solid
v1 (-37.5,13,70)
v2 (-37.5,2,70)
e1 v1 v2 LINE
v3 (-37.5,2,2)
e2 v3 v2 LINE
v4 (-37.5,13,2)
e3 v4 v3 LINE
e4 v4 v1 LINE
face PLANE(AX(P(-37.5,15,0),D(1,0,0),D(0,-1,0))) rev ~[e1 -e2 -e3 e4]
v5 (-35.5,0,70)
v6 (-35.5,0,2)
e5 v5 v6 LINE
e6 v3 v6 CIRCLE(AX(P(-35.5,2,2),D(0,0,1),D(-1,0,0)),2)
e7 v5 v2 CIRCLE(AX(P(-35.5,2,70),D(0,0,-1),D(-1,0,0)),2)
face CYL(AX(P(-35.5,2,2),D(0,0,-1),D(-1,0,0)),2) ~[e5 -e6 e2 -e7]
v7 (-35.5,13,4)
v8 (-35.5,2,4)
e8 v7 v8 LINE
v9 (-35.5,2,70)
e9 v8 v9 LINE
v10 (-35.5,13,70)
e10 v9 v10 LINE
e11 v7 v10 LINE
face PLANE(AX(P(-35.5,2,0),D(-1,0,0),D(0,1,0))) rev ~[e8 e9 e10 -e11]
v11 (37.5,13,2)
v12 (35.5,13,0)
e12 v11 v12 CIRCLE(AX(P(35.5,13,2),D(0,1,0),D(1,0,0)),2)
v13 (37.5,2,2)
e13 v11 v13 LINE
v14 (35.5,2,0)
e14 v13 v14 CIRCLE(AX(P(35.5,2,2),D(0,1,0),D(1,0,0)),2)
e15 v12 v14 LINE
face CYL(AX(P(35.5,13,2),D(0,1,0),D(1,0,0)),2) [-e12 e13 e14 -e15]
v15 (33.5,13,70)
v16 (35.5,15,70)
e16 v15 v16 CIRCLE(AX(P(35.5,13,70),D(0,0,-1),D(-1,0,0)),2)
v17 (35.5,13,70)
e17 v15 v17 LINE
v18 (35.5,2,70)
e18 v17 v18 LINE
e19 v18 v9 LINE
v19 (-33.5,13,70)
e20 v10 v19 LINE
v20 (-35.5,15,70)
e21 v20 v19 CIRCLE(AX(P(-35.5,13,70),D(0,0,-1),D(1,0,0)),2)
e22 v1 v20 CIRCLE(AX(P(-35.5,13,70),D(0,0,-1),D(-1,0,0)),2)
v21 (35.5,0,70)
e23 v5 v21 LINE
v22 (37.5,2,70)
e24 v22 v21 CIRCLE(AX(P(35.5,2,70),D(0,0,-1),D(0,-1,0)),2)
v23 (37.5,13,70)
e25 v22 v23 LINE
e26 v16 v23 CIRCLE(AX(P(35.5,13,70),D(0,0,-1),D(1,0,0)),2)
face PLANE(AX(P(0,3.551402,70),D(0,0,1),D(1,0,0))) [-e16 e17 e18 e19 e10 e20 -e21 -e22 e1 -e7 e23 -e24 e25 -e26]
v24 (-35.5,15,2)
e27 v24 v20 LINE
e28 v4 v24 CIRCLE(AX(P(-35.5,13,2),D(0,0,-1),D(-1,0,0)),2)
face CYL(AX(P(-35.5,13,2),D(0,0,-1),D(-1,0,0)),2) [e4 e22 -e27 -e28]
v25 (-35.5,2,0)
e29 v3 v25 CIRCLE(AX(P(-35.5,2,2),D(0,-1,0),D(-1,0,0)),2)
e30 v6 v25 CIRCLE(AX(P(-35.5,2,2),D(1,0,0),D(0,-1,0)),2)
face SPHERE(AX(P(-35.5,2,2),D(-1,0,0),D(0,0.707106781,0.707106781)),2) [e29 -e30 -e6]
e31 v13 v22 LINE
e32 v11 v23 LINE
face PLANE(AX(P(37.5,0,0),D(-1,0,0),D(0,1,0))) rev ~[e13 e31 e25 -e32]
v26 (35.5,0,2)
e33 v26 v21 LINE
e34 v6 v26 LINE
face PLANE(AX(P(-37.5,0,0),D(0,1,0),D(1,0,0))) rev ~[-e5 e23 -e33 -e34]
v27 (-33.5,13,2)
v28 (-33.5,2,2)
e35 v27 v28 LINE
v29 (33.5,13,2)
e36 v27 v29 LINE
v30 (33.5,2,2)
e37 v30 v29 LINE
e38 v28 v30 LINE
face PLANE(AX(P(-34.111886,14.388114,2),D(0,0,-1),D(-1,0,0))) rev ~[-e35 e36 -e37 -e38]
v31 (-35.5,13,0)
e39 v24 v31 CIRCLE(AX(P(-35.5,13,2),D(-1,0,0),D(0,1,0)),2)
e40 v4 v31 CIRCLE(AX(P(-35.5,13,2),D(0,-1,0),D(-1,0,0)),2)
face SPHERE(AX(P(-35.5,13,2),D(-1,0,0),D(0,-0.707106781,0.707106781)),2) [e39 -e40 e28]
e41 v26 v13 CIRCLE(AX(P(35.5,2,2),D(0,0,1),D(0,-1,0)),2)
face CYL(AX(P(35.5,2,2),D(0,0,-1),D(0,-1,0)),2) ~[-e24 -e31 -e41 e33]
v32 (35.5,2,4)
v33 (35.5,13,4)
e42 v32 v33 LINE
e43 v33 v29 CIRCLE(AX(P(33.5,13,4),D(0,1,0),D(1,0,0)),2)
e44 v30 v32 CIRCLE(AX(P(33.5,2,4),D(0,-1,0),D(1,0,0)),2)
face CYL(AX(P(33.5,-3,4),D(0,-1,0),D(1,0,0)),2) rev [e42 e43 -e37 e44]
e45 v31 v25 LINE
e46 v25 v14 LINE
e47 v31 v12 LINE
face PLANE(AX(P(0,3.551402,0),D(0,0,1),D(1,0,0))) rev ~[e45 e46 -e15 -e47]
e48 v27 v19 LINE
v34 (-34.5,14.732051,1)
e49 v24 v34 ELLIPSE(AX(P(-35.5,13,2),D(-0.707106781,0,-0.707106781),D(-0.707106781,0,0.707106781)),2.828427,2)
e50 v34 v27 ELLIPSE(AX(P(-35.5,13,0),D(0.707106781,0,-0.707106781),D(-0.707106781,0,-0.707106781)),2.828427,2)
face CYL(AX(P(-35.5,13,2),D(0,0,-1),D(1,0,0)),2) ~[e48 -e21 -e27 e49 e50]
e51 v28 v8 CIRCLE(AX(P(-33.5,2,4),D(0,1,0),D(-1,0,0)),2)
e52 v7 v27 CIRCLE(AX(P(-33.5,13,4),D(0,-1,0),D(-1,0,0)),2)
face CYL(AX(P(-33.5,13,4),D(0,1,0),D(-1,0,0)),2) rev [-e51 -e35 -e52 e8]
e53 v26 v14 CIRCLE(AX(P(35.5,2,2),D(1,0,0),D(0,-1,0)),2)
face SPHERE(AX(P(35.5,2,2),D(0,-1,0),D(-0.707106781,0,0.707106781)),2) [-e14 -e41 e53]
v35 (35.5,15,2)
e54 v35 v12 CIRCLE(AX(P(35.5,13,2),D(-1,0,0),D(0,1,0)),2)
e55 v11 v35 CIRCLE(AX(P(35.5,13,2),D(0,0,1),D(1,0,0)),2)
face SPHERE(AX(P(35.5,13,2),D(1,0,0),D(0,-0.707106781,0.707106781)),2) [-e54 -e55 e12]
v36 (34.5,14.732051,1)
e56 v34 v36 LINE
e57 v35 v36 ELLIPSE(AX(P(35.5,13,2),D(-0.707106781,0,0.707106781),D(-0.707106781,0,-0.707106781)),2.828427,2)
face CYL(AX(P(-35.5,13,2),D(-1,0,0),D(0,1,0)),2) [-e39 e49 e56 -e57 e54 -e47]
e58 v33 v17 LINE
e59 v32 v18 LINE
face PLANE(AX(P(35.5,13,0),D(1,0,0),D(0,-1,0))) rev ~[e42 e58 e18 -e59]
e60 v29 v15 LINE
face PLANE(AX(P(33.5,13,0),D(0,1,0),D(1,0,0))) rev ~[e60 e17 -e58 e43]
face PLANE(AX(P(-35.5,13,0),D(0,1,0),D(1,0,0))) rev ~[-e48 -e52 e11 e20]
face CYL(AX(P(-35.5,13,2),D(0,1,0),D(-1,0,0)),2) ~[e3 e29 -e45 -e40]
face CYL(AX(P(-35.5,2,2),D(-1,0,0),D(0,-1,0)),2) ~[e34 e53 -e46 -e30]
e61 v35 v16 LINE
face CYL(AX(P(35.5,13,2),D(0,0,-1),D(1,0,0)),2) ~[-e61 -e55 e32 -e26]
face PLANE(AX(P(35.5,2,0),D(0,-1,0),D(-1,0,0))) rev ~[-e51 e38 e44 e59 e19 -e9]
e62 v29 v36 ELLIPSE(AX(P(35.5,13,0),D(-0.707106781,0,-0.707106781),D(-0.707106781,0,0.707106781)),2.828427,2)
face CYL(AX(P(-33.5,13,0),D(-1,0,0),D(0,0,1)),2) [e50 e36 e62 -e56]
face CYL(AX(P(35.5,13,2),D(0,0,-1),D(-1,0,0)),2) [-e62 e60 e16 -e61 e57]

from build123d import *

# Parameters (mm, degrees)
F0_DEPTH     = 70
F1_W         = 75
F1_H         = 15
F4_DEPTH     = 2
F2_T1_DEPTH  = 11
F2_T3_DEPTH  = 73
F2_T5_DEPTH  = 67
F2_T7_DEPTH  = 71
F2_S11_W     = 2.04
F2_S11_H     = 2.04
F2_T12_DEPTH = 2.04
F2_S17_W     = 2.04
F2_S17_H     = 2.04
F2_T18_DEPTH = 2.04
F2_S23_W     = 2.04
F2_S23_H     = 2.04
F2_T24_DEPTH = 2.04
F2_S29_W     = 2.04
F2_S29_H     = 2.04
F2_T30_DEPTH = 2.04
F2_T37_DEPTH = 73
F2_T42_DEPTH = 72
F2_T50_DEPTH = 72
F2_T55_DEPTH = 73
F2_T62_DEPTH = 16
F2_T67_DEPTH = 16


# Not quite as in the source:
# - a fillet or chamfer that OpenCascade refuses, or shapes differently, is made with other operations: its cross-section is extruded or revolved along the edge and cut away or added
# - a feature names something its author has since deleted; it is built from what else it names


with BuildPart() as f0:
    # F3 (on Top) → F0 (new body)
    with BuildSketch(Plane.XY):
        Polygon((-37.5, 15), (-37.5, 0), (37.5, 0), (37.5, 15), (33.5, 15), (33.5, 13), (35.5, 13), (35.5, 2), (-35.5, 2), (-35.5, 13), (-33.5, 13), (-33.5, 15), align=None)
    extrude(amount=F0_DEPTH)

    # F1 (on face) → F4 (join)
    with BuildSketch(Plane(origin=(0, 0, 0), x_dir=(1, 0, 0), z_dir=(0, 0, -1))):
        with Locations((0, -7.5)):
            Rectangle(F1_W, F1_H)
    extrude(amount=-F4_DEPTH)

    # F2: fillet of radius 2 on 13 edges, made by hand

    # F2_s2 → F2_t1 (cut)
    with BuildSketch(Plane.XZ.offset(-13)):
        with BuildLine():
            ThreePointArc((37.5, 2), (36.9142135624, 0.5857864376), (35.5, 0))
            Line((35.5, 0), (37.5, 0))
            Line((37.5, 0), (37.5, 2))
        make_face()
        with BuildLine():
            ThreePointArc((-37.5, 2), (-36.9142135624, 0.5857864376), (-35.5, 0))
            Line((-35.5, 0), (-37.5, 0))
            Line((-37.5, 0), (-37.5, 2))
        make_face()
    extrude(amount=F2_T1_DEPTH, mode=Mode.SUBTRACT)

    # F2_s4 → F2_t3 (cut)
    with BuildSketch(Plane.XY.offset(2)):
        with BuildLine():
            ThreePointArc((-37.5, 2), (-36.9142135624, 0.5857864376), (-35.5, 0))
            Line((-35.5, 0), (-37.5, 0))
            Line((-37.5, 0), (-37.5, 2))
        make_face()
        with BuildLine():
            ThreePointArc((35.5, 0), (36.9142135624, 0.5857864376), (37.5, 2))
            Line((37.5, 2), (37.5, 0))
            Line((37.5, 0), (35.5, 0))
        make_face()
        with BuildLine():
            ThreePointArc((-37.5, 13), (-36.9142135624, 14.4142135624), (-35.5, 15))
            Line((-35.5, 15), (-37.5, 15))
            Line((-37.5, 15), (-37.5, 13))
        make_face()
        with BuildLine():
            ThreePointArc((37.5, 13), (36.9142135624, 14.4142135624), (35.5, 15))
            Line((35.5, 15), (37.5, 15))
            Line((37.5, 15), (37.5, 13))
        make_face()
        with BuildLine():
            ThreePointArc((-33.5, 13), (-34.0857864376, 14.4142135624), (-35.5, 15))
            Line((-35.5, 15), (-33.5, 15))
            Line((-33.5, 15), (-33.5, 13))
        make_face()
        with BuildLine():
            ThreePointArc((33.5, 13), (34.0857864376, 14.4142135624), (35.5, 15))
            Line((35.5, 15), (33.5, 15))
            Line((33.5, 15), (33.5, 13))
        make_face()
    extrude(amount=F2_T3_DEPTH, mode=Mode.SUBTRACT)

    # F2_s6 → F2_t5 (cut)
    with BuildSketch(Plane.YZ.offset(-33.5)):
        with BuildLine():
            ThreePointArc((13, 2), (14.4142135624, 1.4142135624), (15, 0))
            Line((15, 0), (15, 2))
            Line((15, 2), (13, 2))
        make_face()
    extrude(amount=F2_T5_DEPTH, mode=Mode.SUBTRACT)

    # F2_s8 → F2_t7 (cut)
    with BuildSketch(Plane.YZ.offset(-35.5)):
        with BuildLine():
            ThreePointArc((0, 2), (0.5857864376, 0.5857864376), (2, 0))
            Line((2, 0), (0, 0))
            Line((0, 0), (0, 2))
        make_face()
        with BuildLine():
            ThreePointArc((15, 2), (14.4142135624, 0.5857864376), (13, 0))
            Line((13, 0), (15, 0))
            Line((15, 0), (15, 2))
        make_face()
    extrude(amount=F2_T7_DEPTH, mode=Mode.SUBTRACT)


with BuildPart() as f2_tool10:
    # F2_s11 → F2_t12 (new body)
    with BuildSketch(Plane.XZ.offset(-2)):
        with Locations((36.52, 0.98)):
            Rectangle(F2_S11_W, F2_S11_H)
    extrude(amount=F2_T12_DEPTH)

    # F2_s13 → F2_t14 (revolve, cut)
    with BuildSketch(Plane(origin=(35.5, 2, 2), x_dir=(-0.7071067812, 0, 0.7071067812), z_dir=(0.7071067812, 0, 0.7071067812))):
        with BuildLine():
            ThreePointArc((0, -2), (2, 0), (0, 2))
            Line((0, 2), (0, -2))
        make_face()
    revolve(axis=Axis((35.5, 2, 2), (0, -1, 0)), mode=Mode.SUBTRACT)


with BuildPart() as f0_1:
    add(f0.part)

    # F2_t9: cut F2_tool10
    add(f2_tool10.part, mode=Mode.SUBTRACT)


with BuildPart() as f2_tool16:
    # F2_s17 → F2_t18 (new body)
    with BuildSketch(Plane.YZ.offset(35.5)):
        with Locations((14.02, 0.98)):
            Rectangle(F2_S17_W, F2_S17_H)
    extrude(amount=F2_T18_DEPTH)

    # F2_s19 → F2_t20 (revolve, cut)
    with BuildSketch(Plane(origin=(35.5, 13, 2), x_dir=(0, -0.7071067812, 0.7071067812), z_dir=(0, 0.7071067812, 0.7071067812))):
        with BuildLine():
            ThreePointArc((0, -2), (2, 0), (0, 2))
            Line((0, 2), (0, -2))
        make_face()
    revolve(axis=Axis((35.5, 13, 2), (1, 0, 0)), mode=Mode.SUBTRACT)


with BuildPart() as f0_2:
    add(f0_1.part)

    # F2_t15: cut F2_tool16
    add(f2_tool16.part, mode=Mode.SUBTRACT)


with BuildPart() as f2_tool22:
    # F2_s23 → F2_t24 (new body)
    with BuildSketch(Plane.YZ.offset(-35.5)):
        with Locations((14.02, 0.98)):
            Rectangle(F2_S23_W, F2_S23_H)
    extrude(amount=-F2_T24_DEPTH)

    # F2_s25 → F2_t26 (revolve, cut)
    with BuildSketch(Plane(origin=(-35.5, 13, 2), x_dir=(0, -0.7071067812, 0.7071067812), z_dir=(0, -0.7071067812, -0.7071067812))):
        with BuildLine():
            ThreePointArc((0, -2), (2, 0), (0, 2))
            Line((0, 2), (0, -2))
        make_face()
    revolve(axis=Axis((-35.5, 13, 2), (-1, 0, 0)), mode=Mode.SUBTRACT)


with BuildPart() as f0_3:
    add(f0_2.part)

    # F2_t21: cut F2_tool22
    add(f2_tool22.part, mode=Mode.SUBTRACT)


with BuildPart() as f2_tool28:
    # F2_s29 → F2_t30 (new body)
    with BuildSketch(Plane.YZ.offset(-35.5)):
        with Locations((0.98, 0.98)):
            Rectangle(F2_S29_W, F2_S29_H)
    extrude(amount=-F2_T30_DEPTH)

    # F2_s31 → F2_t32 (revolve, cut)
    with BuildSketch(Plane(origin=(-35.5, 2, 2), x_dir=(0, 0.7071067812, 0.7071067812), z_dir=(0, -0.7071067812, 0.7071067812))):
        with BuildLine():
            ThreePointArc((0, -2), (2, 0), (0, 2))
            Line((0, 2), (0, -2))
        make_face()
    revolve(axis=Axis((-35.5, 2, 2), (-1, 0, 0)), mode=Mode.SUBTRACT)


with BuildPart() as f0_4:
    add(f0_3.part)

    # F2_t27: cut F2_tool28
    add(f2_tool28.part, mode=Mode.SUBTRACT)


with BuildPart() as f2_tool35:
    # F2_s36 → F2_t37 (new body)
    with BuildSketch(Plane.XY.offset(-3)):
        with BuildLine():
            ThreePointArc((-33.5, 13), (-34.0857864376, 14.4142135624), (-35.5, 15))
            Line((-35.5, 15), (-33.5, 15))
            Line((-33.5, 15), (-33.5, 13))
        make_face()
    extrude(amount=F2_T37_DEPTH)

    split(bisect_by=Plane.XY.offset(2), keep=Keep.BOTTOM)

    split(bisect_by=Plane.XY, keep=Keep.TOP)


with BuildPart() as f2_tool40:
    # F2_s41 → F2_t42 (new body)
    with BuildSketch(Plane.YZ.offset(-38.5)):
        with BuildLine():
            ThreePointArc((13, 2), (14.4142135624, 1.4142135624), (15, 0))
            Line((15, 0), (15, 2))
            Line((15, 2), (13, 2))
        make_face()
    extrude(amount=F2_T42_DEPTH)

    split(bisect_by=Plane.YZ.offset(-33.5), keep=Keep.BOTTOM)

    split(bisect_by=Plane.YZ.offset(-35.5), keep=Keep.TOP)


with BuildPart() as f2_tool35_1:
    add(f2_tool35.part)

    # F2_t45: intersect F2_tool40
    add(f2_tool40.part, mode=Mode.INTERSECT)


with BuildPart() as f0_5:
    add(f0_4.part)

    # F2_t33: cut F2_tool35
    add(f2_tool35_1.part, mode=Mode.SUBTRACT)


with BuildPart() as f2_tool48:
    # F2_s49 → F2_t50 (new body)
    with BuildSketch(Plane.YZ.offset(-33.5)):
        with BuildLine():
            ThreePointArc((13, 2), (14.4142135624, 1.4142135624), (15, 0))
            Line((15, 0), (15, 2))
            Line((15, 2), (13, 2))
        make_face()
    extrude(amount=F2_T50_DEPTH)

    split(bisect_by=Plane.YZ.offset(35.5), keep=Keep.BOTTOM)

    split(bisect_by=Plane.YZ.offset(33.5), keep=Keep.TOP)


with BuildPart() as f2_tool53:
    # F2_s54 → F2_t55 (new body)
    with BuildSketch(Plane.XY.offset(-3)):
        with BuildLine():
            ThreePointArc((33.5, 13), (34.0857864376, 14.4142135624), (35.5, 15))
            Line((35.5, 15), (33.5, 15))
            Line((33.5, 15), (33.5, 13))
        make_face()
    extrude(amount=F2_T55_DEPTH)

    split(bisect_by=Plane.XY.offset(2), keep=Keep.BOTTOM)

    split(bisect_by=Plane.XY, keep=Keep.TOP)


with BuildPart() as f2_tool48_1:
    add(f2_tool48.part)

    # F2_t58: intersect F2_tool53
    add(f2_tool53.part, mode=Mode.INTERSECT)


with BuildPart() as f0_6:
    add(f0_5.part)

    # F2_t46: cut F2_tool48
    add(f2_tool48_1.part, mode=Mode.SUBTRACT)


with BuildPart() as f2_tool60:
    # F2_s61 → F2_t62 (new body)
    with BuildSketch(Plane.XZ.offset(3)):
        with BuildLine():
            ThreePointArc((35.5, 4), (34.9142135624, 2.5857864376), (33.5, 2))
            Line((33.5, 2), (35.5, 2))
            Line((35.5, 2), (35.5, 4))
        make_face()
    extrude(amount=-F2_T62_DEPTH)

    split(bisect_by=Plane.XZ, keep=Keep.BOTTOM)


with BuildPart() as f0_7:
    add(f0_6.part)

    # F2_t59: union F2_tool60
    add(f2_tool60.part)


with BuildPart() as f2_tool65:
    # F2_s66 → F2_t67 (new body)
    with BuildSketch(Plane.XZ.offset(-13)):
        with BuildLine():
            ThreePointArc((-35.5, 4), (-34.9142135624, 2.5857864376), (-33.5, 2))
            Line((-33.5, 2), (-35.5, 2))
            Line((-35.5, 2), (-35.5, 4))
        make_face()
    extrude(amount=F2_T67_DEPTH)

    split(bisect_by=Plane.XZ, keep=Keep.BOTTOM)


with BuildPart() as f0_8:
    add(f0_7.part)

    # F2_t64: union F2_tool65
    add(f2_tool65.part)


solid = f0_8.part
